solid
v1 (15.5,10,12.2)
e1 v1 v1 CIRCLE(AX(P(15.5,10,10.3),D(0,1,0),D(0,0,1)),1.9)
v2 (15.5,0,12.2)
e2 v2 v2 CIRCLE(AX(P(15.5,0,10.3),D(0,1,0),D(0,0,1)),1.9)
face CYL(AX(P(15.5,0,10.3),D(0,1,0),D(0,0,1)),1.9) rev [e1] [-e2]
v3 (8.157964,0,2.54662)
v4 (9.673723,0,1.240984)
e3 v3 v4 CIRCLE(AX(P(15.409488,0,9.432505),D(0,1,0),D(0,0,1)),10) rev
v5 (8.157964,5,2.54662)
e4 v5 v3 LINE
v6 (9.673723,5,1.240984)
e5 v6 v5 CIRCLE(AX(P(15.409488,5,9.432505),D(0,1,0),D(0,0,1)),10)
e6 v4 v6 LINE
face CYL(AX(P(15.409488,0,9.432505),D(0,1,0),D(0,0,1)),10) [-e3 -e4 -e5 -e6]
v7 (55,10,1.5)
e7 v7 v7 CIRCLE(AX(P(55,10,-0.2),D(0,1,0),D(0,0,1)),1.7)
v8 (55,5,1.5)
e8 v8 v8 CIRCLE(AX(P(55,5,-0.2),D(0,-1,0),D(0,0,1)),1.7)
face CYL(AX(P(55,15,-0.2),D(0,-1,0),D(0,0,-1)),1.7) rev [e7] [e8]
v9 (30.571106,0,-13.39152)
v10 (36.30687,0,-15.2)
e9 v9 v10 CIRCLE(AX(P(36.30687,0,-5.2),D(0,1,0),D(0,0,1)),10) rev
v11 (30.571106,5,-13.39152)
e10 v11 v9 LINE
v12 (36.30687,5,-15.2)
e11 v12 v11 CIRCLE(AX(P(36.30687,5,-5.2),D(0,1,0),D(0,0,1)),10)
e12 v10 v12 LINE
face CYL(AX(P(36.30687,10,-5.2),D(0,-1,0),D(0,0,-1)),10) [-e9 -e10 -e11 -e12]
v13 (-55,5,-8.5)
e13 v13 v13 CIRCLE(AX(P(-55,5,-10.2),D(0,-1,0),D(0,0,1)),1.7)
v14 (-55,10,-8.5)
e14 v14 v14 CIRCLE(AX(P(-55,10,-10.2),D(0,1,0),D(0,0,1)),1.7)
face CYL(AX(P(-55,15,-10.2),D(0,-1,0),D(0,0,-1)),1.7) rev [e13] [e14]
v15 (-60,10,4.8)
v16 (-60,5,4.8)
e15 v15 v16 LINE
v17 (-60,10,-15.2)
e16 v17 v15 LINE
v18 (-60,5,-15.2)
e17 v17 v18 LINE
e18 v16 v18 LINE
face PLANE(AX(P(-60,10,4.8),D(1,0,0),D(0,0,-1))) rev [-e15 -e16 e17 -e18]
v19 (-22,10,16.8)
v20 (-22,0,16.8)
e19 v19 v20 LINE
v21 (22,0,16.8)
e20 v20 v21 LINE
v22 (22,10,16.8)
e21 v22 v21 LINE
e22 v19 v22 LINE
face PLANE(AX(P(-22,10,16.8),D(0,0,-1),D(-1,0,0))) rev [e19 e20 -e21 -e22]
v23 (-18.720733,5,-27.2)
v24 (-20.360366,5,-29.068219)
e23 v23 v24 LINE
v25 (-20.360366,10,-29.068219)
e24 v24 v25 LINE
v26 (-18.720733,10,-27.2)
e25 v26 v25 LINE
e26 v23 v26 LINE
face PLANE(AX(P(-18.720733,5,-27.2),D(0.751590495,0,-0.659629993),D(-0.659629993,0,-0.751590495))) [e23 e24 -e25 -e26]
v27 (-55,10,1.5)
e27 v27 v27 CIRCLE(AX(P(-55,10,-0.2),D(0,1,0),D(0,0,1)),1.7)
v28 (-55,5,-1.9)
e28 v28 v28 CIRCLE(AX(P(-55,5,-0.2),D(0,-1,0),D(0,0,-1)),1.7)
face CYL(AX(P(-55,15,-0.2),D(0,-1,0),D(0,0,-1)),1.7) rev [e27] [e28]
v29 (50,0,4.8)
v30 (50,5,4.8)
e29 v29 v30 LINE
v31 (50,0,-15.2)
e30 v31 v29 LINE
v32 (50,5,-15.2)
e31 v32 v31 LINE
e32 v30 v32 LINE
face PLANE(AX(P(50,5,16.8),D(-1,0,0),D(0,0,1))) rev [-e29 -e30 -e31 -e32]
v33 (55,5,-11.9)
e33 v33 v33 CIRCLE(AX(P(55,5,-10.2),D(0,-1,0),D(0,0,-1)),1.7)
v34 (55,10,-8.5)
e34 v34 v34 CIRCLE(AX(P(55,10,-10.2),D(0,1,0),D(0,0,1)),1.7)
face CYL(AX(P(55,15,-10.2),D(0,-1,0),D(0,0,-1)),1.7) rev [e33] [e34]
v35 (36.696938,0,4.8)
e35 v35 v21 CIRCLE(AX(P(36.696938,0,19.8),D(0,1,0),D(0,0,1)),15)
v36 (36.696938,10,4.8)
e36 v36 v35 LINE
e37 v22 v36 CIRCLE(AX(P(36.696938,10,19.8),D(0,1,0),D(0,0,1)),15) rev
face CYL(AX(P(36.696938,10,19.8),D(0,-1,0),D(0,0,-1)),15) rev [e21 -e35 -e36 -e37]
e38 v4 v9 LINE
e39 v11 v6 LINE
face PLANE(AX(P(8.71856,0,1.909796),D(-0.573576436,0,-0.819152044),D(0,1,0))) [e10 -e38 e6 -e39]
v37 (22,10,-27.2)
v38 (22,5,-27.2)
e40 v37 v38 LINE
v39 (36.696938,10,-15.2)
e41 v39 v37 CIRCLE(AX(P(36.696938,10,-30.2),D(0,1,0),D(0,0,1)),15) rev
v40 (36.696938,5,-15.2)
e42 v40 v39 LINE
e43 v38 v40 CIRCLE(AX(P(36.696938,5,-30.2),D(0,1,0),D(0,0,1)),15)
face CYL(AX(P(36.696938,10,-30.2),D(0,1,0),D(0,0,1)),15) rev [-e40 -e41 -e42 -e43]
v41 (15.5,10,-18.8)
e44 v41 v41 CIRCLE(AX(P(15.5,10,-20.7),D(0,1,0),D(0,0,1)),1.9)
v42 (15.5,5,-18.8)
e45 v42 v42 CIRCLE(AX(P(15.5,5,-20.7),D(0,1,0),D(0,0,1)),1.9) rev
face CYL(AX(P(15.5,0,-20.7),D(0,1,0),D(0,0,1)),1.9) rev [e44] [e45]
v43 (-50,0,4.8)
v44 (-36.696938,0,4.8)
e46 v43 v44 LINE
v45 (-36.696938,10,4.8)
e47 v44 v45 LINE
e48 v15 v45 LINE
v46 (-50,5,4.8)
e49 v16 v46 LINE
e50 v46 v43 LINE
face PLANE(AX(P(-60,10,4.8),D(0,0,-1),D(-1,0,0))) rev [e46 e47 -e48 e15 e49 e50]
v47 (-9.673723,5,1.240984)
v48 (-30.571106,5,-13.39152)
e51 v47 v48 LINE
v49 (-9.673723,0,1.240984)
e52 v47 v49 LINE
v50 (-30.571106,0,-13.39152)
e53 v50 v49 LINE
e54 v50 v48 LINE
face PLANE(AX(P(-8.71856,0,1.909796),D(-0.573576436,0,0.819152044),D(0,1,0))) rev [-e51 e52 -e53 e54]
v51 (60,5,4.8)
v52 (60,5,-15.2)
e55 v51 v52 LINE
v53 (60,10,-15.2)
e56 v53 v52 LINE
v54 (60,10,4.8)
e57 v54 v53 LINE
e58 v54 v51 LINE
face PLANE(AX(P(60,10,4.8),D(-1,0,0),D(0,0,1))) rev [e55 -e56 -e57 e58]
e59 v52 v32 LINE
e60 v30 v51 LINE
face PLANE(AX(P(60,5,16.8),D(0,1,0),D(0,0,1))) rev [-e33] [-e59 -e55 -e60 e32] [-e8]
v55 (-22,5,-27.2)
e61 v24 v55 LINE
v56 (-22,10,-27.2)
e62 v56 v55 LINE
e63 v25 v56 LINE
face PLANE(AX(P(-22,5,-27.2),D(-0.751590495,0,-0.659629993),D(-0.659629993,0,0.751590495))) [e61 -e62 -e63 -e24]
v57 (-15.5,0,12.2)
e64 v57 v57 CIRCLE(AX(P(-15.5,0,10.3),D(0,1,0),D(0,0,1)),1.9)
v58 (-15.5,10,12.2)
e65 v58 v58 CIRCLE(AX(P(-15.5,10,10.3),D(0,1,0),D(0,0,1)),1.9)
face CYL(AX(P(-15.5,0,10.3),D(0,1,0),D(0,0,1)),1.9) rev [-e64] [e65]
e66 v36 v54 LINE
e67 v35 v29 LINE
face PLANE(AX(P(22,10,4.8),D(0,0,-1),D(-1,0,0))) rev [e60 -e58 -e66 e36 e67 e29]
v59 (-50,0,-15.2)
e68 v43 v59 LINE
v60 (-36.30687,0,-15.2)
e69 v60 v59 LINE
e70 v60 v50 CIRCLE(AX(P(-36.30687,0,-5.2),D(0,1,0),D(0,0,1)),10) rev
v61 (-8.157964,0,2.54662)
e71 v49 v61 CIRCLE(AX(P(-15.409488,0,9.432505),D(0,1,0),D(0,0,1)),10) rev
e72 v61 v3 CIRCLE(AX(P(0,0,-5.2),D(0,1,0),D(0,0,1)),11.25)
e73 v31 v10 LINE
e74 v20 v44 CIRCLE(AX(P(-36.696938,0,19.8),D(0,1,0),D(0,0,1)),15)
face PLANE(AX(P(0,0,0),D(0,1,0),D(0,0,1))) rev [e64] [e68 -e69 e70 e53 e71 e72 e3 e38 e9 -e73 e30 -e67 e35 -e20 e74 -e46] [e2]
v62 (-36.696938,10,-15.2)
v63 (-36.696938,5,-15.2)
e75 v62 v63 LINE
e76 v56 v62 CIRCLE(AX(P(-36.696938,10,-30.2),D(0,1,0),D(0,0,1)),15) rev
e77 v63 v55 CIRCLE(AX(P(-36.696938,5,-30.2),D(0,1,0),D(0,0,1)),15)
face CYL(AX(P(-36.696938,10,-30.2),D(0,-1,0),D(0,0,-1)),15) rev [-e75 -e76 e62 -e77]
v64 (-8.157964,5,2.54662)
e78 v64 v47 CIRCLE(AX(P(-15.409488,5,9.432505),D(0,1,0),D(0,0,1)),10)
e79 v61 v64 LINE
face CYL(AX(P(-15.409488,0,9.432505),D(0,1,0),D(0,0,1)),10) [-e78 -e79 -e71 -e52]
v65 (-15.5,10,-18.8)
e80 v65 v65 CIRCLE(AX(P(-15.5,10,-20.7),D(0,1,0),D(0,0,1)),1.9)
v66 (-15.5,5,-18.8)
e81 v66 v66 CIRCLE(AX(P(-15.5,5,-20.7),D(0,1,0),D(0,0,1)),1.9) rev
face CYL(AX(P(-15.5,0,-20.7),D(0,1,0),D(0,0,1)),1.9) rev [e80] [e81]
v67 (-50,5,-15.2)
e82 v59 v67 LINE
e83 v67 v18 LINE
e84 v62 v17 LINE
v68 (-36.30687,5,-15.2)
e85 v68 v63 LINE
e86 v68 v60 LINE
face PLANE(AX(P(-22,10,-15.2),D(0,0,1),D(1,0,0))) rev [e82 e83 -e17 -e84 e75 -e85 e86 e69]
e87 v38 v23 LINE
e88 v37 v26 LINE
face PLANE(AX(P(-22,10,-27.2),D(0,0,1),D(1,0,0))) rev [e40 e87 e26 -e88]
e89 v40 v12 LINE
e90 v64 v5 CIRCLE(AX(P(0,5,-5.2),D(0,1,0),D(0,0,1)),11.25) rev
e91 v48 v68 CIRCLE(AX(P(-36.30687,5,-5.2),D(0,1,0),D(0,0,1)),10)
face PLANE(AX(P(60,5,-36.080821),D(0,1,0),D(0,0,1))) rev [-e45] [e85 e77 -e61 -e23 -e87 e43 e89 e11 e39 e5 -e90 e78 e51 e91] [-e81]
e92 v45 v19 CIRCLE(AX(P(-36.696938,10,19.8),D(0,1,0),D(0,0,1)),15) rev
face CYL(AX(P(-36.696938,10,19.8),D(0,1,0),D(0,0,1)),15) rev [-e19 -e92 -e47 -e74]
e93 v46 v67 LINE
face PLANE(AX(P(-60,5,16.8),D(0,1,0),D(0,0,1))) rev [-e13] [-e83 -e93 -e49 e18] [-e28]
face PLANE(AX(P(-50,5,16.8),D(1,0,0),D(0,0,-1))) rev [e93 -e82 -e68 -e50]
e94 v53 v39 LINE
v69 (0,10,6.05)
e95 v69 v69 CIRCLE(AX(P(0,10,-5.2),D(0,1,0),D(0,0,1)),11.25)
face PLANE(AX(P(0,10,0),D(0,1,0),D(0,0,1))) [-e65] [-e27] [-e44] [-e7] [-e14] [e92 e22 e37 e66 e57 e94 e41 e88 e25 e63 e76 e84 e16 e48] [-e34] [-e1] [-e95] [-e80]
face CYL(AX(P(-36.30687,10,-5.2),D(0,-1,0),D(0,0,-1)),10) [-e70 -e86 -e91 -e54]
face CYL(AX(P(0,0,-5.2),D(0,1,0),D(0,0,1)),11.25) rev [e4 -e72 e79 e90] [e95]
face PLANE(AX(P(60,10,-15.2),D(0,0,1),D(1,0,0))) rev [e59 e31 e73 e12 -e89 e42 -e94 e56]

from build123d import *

# Parameters (mm, degrees)
AUFSATZ_LINEAR_AUSTRAGEN1_DEPTH      = 10
SKIZZE6_R                            = 1.9
SKIZZE6_R_2                          = 11.25
SCHNITT_LINEAR_AUSTRAGEN4_DEPTH      = 67.632124385
SKIZZE7_W                            = 20.880821379
SKIZZE7_H                            = 5
SCHNITT_LINEAR_AUSTRAGEN5_DEPTH      = 87.970339772
VERRUNDUNG3_R                        = 15
SCHNITT_LINEAR_AUSTRAGEN6_DEPTH      = 69.73136111
SCHNITT_LINEAR_AUSTRAGEN6_DEPTH_BACK = 69.73136111
SKIZZE8_W                            = 10
SKIZZE8_H                            = 5
SKIZZE9_R                            = 1.7
SCHNITT_LINEAR_AUSTRAGEN7_DEPTH      = 10
AUFSATZ_LINEAR_AUSTRAGEN2_DEPTH      = 5
FASE1_DEPTH                          = 5
VERRUNDUNG6_R                        = 10


with BuildPart() as part:
    # Skizze1 → Aufsatz-Linear austragen1 (new body)
    with BuildSketch(Plane(origin=(0, 0, 0), x_dir=(1, 0, 0), z_dir=(0, 1, 0))):
        Polygon((-60, -4.8), (-22, -4.8), (-22, -16.8), (22, -16.8), (22, -4.8), (60, -4.8), (60, 15.2), (22, 15.2), (22, 27.2), (0, 27.2), (-22, 27.2), (-22, 15.2), (-60, 15.2), align=None)
    extrude(amount=AUFSATZ_LINEAR_AUSTRAGEN1_DEPTH)

    # Skizze6 → Schnitt-Linear austragen4 (cut, through all)
    with BuildSketch(Plane(origin=(0, 10, 0), x_dir=(1, 0, 0), z_dir=(0, 1, 0))):
        with Locations(Location((15.5, 20.7, 0), (0, 0, 270))):
            Circle(SKIZZE6_R)
        with Locations(Location((15.5, -10.3, 0), (0, 0, 270))):
            Circle(SKIZZE6_R)
        with Locations(Location((-15.5, -10.3, 0), (0, 0, 270))):
            Circle(SKIZZE6_R)
        with Locations(Location((-15.5, 20.7, 0), (0, 0, 270))):
            Circle(SKIZZE6_R)
        with Locations(Location((0, 5.2, 0), (0, 0, 270))):
            Circle(SKIZZE6_R_2)
    extrude(amount=-SCHNITT_LINEAR_AUSTRAGEN4_DEPTH, mode=Mode.SUBTRACT)

    # Skizze7 → Schnitt-Linear austragen5 (cut, through all)
    with BuildSketch(Plane.ZY.offset(22)):
        with Locations((-25.64041069, 2.5)):
            Rectangle(SKIZZE7_W, SKIZZE7_H)
    extrude(amount=-SCHNITT_LINEAR_AUSTRAGEN5_DEPTH, mode=Mode.SUBTRACT)

    # Verrundung3
    # the kernel refuses this fillet: 15 mm, written as the material it adds along each edge
    with BuildSketch(Plane(origin=(-22, 5, -15.2), x_dir=(0, 0, -1), z_dir=(0, 1, 0))) as verrundung3_piece_1:
        with BuildLine():
            CenterArc((15, 14.696938457), VERRUNDUNG3_R, 180, 78.463040967)
            Line((0, 14.696938457), (-0.3, 14.696938457))
            Line((-0.3, 14.696938457), (-0.3, 0))
            Line((-0.3, 0), (0, -0.3))
            ThreePointArc((0, -0.3), (6, -0.3), (11.94, -0.293938769))
            Line((11.94, -0.293938769), (12, 0))
        make_face()
    extrude(amount=5)
    with BuildSketch(Plane(origin=(-22, 0, 4.8), x_dir=(-1, 0, 0), z_dir=(0, 1, 0))) as verrundung3_piece_2:
        with BuildLine():
            CenterArc((14.696938457, 15), VERRUNDUNG3_R, 191.536959033, 78.463040967)
            Line((0, 12), (-0.293938769, 11.94))
            ThreePointArc((-0.293938769, 11.94), (-0.3, 6), (-0.3, 0))
            Line((-0.3, 0), (0, -0.3))
            Line((0, -0.3), (14.696938457, -0.3))
            Line((14.696938457, -0.3), (14.696938457, 0))
        make_face()
    extrude(amount=10)
    with BuildSketch(Plane(origin=(22, 0, 4.8), x_dir=(1, 0, 0), z_dir=(0, 1, 0))) as verrundung3_piece_3:
        with BuildLine():
            CenterArc((14.696938457, -15), VERRUNDUNG3_R, 90, 78.463040967)
            Line((0, -12), (-0.293938769, -11.94))
            ThreePointArc((-0.293938769, -11.94), (-0.3, -6), (-0.3, 0))
            Line((-0.3, 0), (0, 0.3))
            Line((0, 0.3), (14.696938457, 0.3))
            Line((14.696938457, 0.3), (14.696938457, 0))
        make_face()
    extrude(amount=10)
    with BuildSketch(Plane(origin=(22, 5, -15.2), x_dir=(1, 0, 0), z_dir=(0, 1, 0))) as verrundung3_piece_4:
        with BuildLine():
            CenterArc((14.696938457, 15), VERRUNDUNG3_R, 191.536959033, 78.463040967)
            Line((0, 12), (-0.293938769, 11.94))
            ThreePointArc((-0.293938769, 11.94), (-0.3, 6), (-0.3, 0))
            Line((-0.3, 0), (0, -0.3))
            Line((0, -0.3), (14.696938457, -0.3))
            Line((14.696938457, -0.3), (14.696938457, 0))
        make_face()
    extrude(amount=5)

    # Skizze8 → Schnitt-Linear austragen6 (cut, two sides: drawn at the far end of the back side and taken through both)
    with BuildSketch(Plane(origin=(0, 0, -15.2), x_dir=(-1, 0, 0), z_dir=(0, 0, -1)).offset(-SCHNITT_LINEAR_AUSTRAGEN6_DEPTH_BACK)):
        with Locations((-55, 2.5)):
            Rectangle(SKIZZE8_W, SKIZZE8_H)
        with Locations((55, 2.5)):
            Rectangle(SKIZZE8_W, SKIZZE8_H)
    extrude(amount=SCHNITT_LINEAR_AUSTRAGEN6_DEPTH + SCHNITT_LINEAR_AUSTRAGEN6_DEPTH_BACK, mode=Mode.SUBTRACT)

    # Skizze9 → Schnitt-Linear austragen7 (cut)
    with BuildSketch(Plane.XZ.offset(-5)):
        with Locations(Location((-55, -0.2, 0), (0, 0, 270))):
            Circle(SKIZZE9_R)
        with Locations(Location((-55, -10.2, 0), (0, 0, 90))):
            Circle(SKIZZE9_R)
        with Locations(Location((55, -10.2, 0), (0, 0, 270))):
            Circle(SKIZZE9_R)
        with Locations(Location((55, -0.2, 0), (0, 0, 90))):
            Circle(SKIZZE9_R)
    extrude(amount=-SCHNITT_LINEAR_AUSTRAGEN7_DEPTH, mode=Mode.SUBTRACT)

    # Skizze10 → Aufsatz-Linear austragen2 (add)
    with BuildSketch(Plane(origin=(0, 10, 0), x_dir=(1, 0, 0), z_dir=(0, 1, 0))):
        Polygon((-22, 27.2), (-20.360366379, 29.068218634), (-18.720732758, 27.2), align=None)
    extrude(amount=-AUFSATZ_LINEAR_AUSTRAGEN2_DEPTH)

    # Fase1: read off the stored shape, not the designer's step
    # Fase1 outline → Fase1 (cut)
    with BuildSketch(Plane(origin=(0, 0, 0), x_dir=(1, 0, 0), z_dir=(0, 1, 0))):
        with BuildLine():
            Line((-5.153882032, 15.2), (-33.153882032, 15.2))
            Line((-33.153882032, 15.2), (-8.71856035, -1.90979644))
            ThreePointArc((-8.71856035, -1.90979644), (-11.013512063, 7.494570119), (-5.153882032, 15.2))
        make_face()
        with BuildLine():
            ThreePointArc((5.153882032, 15.2), (11.013512063, 7.494570119), (8.71856035, -1.90979644))
            Line((8.71856035, -1.90979644), (33.153882032, 15.2))
            Line((33.153882032, 15.2), (5.153882032, 15.2))
        make_face()
    extrude(amount=FASE1_DEPTH, mode=Mode.SUBTRACT)

    # Verrundung6
    verrundung6_edges = [part.edges().sort_by_distance(p)[0] for p in [
        (8.71856035, 2.5, 1.90979644),
        (-8.71856035, 2.5, 1.90979644),
        (-33.153882032, 2.5, -15.2),
        (33.153882032, 2.5, -15.2),
    ]]
    fillet(verrundung6_edges, radius=VERRUNDUNG6_R)


solid = part.part
